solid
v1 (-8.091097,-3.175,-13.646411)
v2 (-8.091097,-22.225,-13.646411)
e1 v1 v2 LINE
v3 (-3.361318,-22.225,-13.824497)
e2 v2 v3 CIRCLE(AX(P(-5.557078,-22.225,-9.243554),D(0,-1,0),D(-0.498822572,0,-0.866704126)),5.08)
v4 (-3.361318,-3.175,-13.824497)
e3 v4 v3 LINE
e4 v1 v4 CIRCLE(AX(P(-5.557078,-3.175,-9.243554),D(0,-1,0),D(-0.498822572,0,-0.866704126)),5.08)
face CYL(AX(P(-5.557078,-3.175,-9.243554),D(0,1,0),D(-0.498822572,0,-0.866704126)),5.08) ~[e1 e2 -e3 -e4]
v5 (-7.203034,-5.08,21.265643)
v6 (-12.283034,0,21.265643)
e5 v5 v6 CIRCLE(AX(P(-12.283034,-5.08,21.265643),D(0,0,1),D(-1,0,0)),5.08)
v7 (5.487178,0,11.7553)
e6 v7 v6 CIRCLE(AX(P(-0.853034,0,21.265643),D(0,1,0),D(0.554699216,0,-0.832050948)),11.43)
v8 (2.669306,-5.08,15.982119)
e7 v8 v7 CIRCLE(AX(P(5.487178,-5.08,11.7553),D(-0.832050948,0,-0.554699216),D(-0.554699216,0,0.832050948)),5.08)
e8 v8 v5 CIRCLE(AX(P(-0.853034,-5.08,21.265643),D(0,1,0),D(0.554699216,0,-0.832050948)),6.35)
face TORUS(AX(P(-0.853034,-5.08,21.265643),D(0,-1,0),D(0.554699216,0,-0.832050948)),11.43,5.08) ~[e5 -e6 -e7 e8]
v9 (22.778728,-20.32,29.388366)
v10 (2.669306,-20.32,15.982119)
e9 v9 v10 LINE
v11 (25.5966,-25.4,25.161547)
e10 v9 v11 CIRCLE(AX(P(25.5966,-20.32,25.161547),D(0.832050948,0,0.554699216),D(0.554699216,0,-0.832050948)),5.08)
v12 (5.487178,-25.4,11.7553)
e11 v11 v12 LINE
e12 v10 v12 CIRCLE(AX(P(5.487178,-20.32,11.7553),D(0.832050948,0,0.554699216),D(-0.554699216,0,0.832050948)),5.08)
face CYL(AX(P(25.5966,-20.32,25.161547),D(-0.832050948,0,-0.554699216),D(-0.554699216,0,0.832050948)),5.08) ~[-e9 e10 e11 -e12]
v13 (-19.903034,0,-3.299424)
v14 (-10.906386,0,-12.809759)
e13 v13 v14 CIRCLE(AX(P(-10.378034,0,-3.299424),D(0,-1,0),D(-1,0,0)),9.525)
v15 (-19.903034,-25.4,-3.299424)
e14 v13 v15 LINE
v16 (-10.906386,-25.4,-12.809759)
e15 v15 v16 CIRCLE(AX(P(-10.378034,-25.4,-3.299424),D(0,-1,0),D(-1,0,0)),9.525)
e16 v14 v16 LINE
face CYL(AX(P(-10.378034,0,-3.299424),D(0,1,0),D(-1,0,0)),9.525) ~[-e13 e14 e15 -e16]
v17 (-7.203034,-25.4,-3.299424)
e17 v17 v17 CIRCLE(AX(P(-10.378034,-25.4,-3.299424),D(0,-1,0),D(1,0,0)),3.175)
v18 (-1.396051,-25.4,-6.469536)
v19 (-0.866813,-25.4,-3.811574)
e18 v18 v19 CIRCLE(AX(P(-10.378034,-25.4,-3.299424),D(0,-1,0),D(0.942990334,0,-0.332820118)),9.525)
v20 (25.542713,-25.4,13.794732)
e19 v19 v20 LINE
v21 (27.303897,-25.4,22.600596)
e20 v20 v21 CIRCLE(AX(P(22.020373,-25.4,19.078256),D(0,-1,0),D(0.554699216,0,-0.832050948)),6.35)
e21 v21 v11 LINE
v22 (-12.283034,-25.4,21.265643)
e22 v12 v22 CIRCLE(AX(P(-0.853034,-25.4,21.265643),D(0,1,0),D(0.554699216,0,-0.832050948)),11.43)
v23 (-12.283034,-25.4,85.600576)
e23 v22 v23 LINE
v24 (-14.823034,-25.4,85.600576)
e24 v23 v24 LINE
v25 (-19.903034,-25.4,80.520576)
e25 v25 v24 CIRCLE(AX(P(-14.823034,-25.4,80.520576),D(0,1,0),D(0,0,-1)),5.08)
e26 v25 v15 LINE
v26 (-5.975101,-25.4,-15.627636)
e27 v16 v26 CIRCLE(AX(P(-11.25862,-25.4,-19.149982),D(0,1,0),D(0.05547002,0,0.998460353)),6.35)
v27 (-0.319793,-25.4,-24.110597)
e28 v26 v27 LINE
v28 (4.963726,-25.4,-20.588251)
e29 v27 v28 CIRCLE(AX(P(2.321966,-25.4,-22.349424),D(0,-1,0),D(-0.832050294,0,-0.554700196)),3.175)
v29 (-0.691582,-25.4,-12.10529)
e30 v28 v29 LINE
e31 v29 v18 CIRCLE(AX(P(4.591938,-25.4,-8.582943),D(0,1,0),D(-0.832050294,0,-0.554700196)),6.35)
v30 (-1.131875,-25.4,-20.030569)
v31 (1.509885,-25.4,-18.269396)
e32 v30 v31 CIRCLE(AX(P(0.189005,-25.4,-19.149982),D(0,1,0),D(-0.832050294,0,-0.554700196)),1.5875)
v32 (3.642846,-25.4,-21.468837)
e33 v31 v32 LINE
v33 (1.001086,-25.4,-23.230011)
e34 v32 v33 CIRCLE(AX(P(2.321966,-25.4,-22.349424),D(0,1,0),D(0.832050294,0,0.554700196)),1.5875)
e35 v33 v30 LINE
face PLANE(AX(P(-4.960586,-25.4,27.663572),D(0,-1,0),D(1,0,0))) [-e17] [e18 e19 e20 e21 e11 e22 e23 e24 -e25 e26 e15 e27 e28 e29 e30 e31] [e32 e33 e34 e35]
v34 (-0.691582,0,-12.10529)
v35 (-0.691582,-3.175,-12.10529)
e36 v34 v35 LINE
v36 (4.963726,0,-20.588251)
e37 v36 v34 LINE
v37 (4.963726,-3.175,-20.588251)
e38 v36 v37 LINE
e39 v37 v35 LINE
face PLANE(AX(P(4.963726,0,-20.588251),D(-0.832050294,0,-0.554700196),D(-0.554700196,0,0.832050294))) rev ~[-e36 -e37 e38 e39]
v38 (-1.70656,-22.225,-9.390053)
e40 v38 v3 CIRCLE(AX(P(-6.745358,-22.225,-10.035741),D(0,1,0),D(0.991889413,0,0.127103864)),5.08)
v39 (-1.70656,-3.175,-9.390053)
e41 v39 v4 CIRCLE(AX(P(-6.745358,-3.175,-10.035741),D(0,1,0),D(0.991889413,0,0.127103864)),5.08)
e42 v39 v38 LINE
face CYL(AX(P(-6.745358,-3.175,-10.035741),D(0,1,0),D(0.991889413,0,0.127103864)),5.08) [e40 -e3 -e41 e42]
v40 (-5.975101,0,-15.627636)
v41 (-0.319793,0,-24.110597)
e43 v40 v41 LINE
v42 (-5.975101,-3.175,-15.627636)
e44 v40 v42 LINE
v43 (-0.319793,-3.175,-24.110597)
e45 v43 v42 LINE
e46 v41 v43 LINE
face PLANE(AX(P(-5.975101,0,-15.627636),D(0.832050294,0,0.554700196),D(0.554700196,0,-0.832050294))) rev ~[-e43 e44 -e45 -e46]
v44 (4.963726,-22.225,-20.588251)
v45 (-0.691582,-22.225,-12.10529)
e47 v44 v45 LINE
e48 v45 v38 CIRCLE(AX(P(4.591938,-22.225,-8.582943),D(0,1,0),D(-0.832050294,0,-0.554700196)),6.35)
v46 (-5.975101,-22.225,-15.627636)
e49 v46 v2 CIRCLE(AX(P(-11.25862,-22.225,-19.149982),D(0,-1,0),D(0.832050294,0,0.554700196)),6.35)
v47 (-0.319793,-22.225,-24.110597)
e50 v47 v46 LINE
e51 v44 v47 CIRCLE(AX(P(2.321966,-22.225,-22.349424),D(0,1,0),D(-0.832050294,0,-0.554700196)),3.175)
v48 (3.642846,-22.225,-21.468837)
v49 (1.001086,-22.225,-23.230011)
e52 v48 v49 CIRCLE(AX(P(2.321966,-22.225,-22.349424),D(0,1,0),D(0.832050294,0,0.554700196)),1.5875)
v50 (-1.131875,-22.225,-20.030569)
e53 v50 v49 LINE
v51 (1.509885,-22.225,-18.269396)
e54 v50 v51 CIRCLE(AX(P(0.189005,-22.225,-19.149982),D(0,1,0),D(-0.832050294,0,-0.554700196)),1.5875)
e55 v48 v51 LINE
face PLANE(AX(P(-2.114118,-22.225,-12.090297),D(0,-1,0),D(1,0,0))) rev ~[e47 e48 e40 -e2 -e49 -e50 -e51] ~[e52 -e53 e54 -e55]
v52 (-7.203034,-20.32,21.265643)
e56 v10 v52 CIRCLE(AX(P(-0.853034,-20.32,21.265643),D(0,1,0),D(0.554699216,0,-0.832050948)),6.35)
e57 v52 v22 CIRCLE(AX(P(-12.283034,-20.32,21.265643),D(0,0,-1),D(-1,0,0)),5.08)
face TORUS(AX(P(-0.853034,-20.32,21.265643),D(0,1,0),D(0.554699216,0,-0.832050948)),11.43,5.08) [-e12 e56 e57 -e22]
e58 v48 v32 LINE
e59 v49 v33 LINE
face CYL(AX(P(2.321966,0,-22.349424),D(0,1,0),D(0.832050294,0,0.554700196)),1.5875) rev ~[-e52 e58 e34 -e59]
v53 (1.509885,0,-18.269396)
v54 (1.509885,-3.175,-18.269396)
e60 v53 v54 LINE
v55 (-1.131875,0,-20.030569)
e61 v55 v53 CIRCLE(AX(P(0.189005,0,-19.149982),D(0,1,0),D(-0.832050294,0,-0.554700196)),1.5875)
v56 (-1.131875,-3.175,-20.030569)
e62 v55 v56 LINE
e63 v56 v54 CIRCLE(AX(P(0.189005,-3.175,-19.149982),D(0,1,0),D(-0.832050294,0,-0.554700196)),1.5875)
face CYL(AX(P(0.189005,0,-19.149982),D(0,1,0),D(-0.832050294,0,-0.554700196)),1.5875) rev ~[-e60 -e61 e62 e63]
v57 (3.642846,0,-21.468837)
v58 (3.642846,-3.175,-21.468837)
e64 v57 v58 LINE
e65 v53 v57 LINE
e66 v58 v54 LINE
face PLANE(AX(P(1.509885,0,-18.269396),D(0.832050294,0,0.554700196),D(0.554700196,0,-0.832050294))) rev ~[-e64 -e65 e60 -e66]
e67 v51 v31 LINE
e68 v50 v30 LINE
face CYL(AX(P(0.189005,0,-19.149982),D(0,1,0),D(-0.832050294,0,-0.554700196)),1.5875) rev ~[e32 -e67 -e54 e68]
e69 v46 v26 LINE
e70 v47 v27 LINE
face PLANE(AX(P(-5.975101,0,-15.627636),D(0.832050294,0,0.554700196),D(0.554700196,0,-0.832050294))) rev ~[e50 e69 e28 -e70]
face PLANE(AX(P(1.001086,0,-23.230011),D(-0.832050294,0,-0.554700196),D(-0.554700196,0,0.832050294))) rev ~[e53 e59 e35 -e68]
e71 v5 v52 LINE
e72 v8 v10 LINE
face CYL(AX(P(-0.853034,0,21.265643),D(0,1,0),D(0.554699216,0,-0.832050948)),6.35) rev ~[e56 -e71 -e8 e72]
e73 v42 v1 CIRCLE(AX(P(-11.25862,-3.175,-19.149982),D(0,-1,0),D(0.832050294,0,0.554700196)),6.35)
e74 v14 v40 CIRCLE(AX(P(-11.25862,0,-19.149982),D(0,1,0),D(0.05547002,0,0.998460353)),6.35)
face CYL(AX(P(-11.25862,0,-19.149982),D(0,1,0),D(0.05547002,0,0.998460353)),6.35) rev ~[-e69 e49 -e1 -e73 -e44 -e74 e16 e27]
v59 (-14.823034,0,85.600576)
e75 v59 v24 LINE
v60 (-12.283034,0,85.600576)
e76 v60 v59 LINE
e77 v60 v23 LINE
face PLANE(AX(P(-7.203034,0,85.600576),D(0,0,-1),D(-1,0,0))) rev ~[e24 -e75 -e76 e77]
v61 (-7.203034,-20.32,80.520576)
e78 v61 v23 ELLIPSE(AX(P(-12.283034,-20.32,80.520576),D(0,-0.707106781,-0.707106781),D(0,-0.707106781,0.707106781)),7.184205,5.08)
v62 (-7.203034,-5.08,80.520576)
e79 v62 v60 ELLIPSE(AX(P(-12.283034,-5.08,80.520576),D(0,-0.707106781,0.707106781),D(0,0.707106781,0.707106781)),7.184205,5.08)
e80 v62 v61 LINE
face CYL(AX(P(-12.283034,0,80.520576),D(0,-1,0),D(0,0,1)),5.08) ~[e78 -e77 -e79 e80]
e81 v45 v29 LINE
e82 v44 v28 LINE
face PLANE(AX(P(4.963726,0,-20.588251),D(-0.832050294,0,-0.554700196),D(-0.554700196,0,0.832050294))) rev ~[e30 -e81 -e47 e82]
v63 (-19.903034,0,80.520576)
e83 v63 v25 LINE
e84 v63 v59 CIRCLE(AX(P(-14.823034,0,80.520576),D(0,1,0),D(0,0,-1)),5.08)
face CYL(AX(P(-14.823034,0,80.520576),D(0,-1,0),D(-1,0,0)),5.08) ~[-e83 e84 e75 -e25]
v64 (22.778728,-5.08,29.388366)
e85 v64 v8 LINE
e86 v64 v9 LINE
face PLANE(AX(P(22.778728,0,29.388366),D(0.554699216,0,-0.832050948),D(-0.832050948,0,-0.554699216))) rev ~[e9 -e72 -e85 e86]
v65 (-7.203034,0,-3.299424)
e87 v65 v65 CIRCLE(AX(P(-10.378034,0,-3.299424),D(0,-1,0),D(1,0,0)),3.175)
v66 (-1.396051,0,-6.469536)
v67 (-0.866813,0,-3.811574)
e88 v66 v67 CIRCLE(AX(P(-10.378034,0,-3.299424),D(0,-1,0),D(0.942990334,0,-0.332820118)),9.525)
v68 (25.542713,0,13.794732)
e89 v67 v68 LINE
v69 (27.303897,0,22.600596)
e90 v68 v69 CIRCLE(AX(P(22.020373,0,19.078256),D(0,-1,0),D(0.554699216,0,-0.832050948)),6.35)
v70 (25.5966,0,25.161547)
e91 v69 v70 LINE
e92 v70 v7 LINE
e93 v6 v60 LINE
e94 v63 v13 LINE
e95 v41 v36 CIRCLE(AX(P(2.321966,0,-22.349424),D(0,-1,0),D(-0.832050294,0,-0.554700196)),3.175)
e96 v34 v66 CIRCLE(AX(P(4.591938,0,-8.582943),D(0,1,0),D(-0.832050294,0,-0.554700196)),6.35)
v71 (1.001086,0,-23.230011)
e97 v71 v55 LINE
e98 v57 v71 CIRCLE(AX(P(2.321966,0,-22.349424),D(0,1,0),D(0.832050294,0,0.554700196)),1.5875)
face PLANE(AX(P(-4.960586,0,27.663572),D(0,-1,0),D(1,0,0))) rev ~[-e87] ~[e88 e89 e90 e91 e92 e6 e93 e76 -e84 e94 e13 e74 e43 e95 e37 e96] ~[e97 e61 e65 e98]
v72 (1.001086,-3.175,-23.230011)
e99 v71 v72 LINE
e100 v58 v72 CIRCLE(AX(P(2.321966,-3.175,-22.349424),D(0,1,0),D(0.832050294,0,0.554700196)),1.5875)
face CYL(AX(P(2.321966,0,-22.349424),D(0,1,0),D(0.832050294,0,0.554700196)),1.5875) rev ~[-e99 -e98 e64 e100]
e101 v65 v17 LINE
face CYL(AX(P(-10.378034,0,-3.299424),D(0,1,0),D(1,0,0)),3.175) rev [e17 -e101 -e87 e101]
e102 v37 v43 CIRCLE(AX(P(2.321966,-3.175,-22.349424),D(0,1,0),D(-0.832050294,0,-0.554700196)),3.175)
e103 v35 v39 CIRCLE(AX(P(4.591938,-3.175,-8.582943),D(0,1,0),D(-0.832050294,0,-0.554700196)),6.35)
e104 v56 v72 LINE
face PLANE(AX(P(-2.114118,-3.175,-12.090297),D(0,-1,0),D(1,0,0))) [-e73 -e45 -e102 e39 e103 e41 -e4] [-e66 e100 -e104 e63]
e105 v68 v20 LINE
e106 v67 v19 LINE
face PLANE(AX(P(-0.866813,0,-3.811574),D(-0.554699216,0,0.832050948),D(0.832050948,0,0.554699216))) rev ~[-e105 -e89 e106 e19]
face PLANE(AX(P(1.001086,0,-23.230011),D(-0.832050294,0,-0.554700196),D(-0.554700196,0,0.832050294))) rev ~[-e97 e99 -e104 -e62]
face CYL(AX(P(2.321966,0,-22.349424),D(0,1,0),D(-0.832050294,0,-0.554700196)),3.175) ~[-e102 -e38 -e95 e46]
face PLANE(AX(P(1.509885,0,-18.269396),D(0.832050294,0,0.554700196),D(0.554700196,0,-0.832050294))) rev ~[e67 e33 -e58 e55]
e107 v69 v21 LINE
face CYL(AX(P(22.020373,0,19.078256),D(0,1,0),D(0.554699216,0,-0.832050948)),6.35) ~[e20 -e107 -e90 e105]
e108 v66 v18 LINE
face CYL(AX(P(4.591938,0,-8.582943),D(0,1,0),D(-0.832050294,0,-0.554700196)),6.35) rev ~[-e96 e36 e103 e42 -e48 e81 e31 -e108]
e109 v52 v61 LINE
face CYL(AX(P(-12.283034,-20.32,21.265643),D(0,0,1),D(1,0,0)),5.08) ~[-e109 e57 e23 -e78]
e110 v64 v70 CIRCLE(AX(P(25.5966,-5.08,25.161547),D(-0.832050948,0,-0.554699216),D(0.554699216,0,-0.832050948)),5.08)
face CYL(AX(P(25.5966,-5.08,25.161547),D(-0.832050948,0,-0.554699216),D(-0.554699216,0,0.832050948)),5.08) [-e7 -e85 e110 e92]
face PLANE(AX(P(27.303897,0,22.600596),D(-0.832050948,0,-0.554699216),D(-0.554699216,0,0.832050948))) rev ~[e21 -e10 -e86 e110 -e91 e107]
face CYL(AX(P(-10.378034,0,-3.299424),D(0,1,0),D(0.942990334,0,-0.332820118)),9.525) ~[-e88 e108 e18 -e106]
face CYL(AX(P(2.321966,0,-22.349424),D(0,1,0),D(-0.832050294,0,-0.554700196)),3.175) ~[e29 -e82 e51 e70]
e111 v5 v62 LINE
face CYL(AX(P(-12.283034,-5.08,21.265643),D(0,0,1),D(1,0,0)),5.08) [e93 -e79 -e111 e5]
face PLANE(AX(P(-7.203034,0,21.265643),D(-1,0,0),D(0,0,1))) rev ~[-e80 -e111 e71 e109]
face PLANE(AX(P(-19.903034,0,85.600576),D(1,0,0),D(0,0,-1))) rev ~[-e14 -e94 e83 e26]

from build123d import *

# Parameters (mm, degrees)
F0_R        = 3.175
F1_DEPTH    = 25.4
F2_R        = 5.08
F3_W        = 19.05
F3_H        = 15.7622399921
F4_DEPTH    = 6.35
F5_T1_DEPTH = 19.05


# Not quite as in the source:
# - a fillet or chamfer that OpenCascade refuses, or shapes differently, is made with other operations: its cross-section is extruded or revolved along the edge and cut away or added


with BuildPart() as f1:
    # F0 (on Front) → F1 (new body)
    with BuildSketch(Plane.XZ):
        with BuildLine():
            ThreePointArc((-0.6915815922, -12.1052896192), (-1.7090267403, -9.3705639378), (-1.3960508414, -6.4695356255))
            ThreePointArc((-1.3960508414, -6.4695356255), (-1.0364150689, -5.1594737521), (-0.8668126136, -3.8115735302))
            Line((-0.8668126136, -3.8115735302), (25.5427133598, 13.7947321605))
            ThreePointArc((25.5427133598, 13.7947321605), (28.2470591636, 17.8329108842), (27.3038968609, 22.6005956999))
            Line((27.3038968609, 22.6005956999), (22.778728087, 29.3883661936))
            Line((22.778728087, 29.3883661936), (2.6693062503, 15.9821192025))
            ThreePointArc((2.6693062503, 15.9821192025), (-3.8493348951, 15.6670107863), (-7.2030337688, 21.2656427228))
            Line((-7.2030337688, 21.2656427228), (-7.2030337688, 85.6005759959))
            Line((-7.2030337688, 85.6005759959), (-19.9030337688, 85.6005759959))
            Line((-19.9030337688, 85.6005759959), (-19.9030337688, -3.2994240041))
            ThreePointArc((-19.9030337688, -3.2994240041), (-17.2975054683, -9.8451505795), (-10.9063857057, -12.8097588684))
            ThreePointArc((-10.9063857057, -12.8097588684), (-8.1081380718, -13.6366381587), (-5.9751009613, -15.6276358652))
            Line((-5.9751009613, -15.6276358652), (-0.3197934533, -24.1105971271))
            ThreePointArc((-0.3197934533, -24.1105971271), (4.0831393542, -24.9911836886), (4.9637259157, -20.5882508811))
            Line((4.9637259157, -20.5882508811), (-0.6915815922, -12.1052896192))
        make_face()
        with Locations((-10.3780337688, -3.2994240041)):
            Circle(F0_R, mode=Mode.SUBTRACT)
        with BuildLine():
            ThreePointArc((3.6428460735, -21.4688374426), (3.2025527927, -23.6703038464), (1.0010863889, -23.2300105656))
            Line((1.0010863889, -23.2300105656), (-1.131874873, -20.0305686727))
            ThreePointArc((-1.131874873, -20.0305686727), (-0.6915815922, -17.829102269), (1.5098848115, -18.2693955497))
            Line((1.5098848115, -18.2693955497), (3.6428460735, -21.4688374426))
        make_face(mode=Mode.SUBTRACT)
    extrude(amount=F1_DEPTH)

    # F2
    f2_edges = [f1.edges().sort_by_distance(p)[0] for p in [
        (-7.203034, -25.4, 53.433109),
        (-7.203034, 0, 53.433109),
        (-7.203034, -12.7, 85.600576),
        (-19.903034, -12.7, 85.600576),
    ]]
    fillet(f2_edges, radius=F2_R)

    # F3 (on face) → F4 (cut, through all)
    with BuildSketch(Plane(origin=(-6.0658440035, 0, -4.0438960023), x_dir=(0, 1, 0), z_dir=(0.8320502943, 0, 0.5547001962))):
        with Locations((-12.7, -17.5697093418)):
            Rectangle(F3_W, F3_H)
    extrude(amount=-F4_DEPTH, mode=Mode.SUBTRACT)

    # F5: fillet of radius 5.08 on 6 edges, made by hand

    # F5_s2 → F5_t1 (cut)
    with BuildSketch(Plane.XZ.offset(3.175)):
        with BuildLine():
            ThreePointArc((-1.706559996, -9.3900529107), (-2.1228958796, -12.1426914098), (-3.9274812175, -14.262556036))
            Line((-3.9274812175, -14.262556036), (-0.6915815922, -12.1052896192))
            ThreePointArc((-0.6915815922, -12.1052896192), (-1.3560793604, -10.8063623925), (-1.706559996, -9.3900529107))
        make_face()
        with BuildLine():
            ThreePointArc((-8.0910969984, -13.6464109123), (-5.3900707363, -14.3208079809), (-2.739201336, -13.4703694484))
            Line((-2.739201336, -13.4703694484), (-5.9751009613, -15.6276358652))
            ThreePointArc((-5.9751009613, -15.6276358652), (-6.9185346443, -14.5146659151), (-8.0910969984, -13.6464109123))
        make_face()
    extrude(amount=F5_T1_DEPTH, mode=Mode.SUBTRACT)


solid = f1.part
